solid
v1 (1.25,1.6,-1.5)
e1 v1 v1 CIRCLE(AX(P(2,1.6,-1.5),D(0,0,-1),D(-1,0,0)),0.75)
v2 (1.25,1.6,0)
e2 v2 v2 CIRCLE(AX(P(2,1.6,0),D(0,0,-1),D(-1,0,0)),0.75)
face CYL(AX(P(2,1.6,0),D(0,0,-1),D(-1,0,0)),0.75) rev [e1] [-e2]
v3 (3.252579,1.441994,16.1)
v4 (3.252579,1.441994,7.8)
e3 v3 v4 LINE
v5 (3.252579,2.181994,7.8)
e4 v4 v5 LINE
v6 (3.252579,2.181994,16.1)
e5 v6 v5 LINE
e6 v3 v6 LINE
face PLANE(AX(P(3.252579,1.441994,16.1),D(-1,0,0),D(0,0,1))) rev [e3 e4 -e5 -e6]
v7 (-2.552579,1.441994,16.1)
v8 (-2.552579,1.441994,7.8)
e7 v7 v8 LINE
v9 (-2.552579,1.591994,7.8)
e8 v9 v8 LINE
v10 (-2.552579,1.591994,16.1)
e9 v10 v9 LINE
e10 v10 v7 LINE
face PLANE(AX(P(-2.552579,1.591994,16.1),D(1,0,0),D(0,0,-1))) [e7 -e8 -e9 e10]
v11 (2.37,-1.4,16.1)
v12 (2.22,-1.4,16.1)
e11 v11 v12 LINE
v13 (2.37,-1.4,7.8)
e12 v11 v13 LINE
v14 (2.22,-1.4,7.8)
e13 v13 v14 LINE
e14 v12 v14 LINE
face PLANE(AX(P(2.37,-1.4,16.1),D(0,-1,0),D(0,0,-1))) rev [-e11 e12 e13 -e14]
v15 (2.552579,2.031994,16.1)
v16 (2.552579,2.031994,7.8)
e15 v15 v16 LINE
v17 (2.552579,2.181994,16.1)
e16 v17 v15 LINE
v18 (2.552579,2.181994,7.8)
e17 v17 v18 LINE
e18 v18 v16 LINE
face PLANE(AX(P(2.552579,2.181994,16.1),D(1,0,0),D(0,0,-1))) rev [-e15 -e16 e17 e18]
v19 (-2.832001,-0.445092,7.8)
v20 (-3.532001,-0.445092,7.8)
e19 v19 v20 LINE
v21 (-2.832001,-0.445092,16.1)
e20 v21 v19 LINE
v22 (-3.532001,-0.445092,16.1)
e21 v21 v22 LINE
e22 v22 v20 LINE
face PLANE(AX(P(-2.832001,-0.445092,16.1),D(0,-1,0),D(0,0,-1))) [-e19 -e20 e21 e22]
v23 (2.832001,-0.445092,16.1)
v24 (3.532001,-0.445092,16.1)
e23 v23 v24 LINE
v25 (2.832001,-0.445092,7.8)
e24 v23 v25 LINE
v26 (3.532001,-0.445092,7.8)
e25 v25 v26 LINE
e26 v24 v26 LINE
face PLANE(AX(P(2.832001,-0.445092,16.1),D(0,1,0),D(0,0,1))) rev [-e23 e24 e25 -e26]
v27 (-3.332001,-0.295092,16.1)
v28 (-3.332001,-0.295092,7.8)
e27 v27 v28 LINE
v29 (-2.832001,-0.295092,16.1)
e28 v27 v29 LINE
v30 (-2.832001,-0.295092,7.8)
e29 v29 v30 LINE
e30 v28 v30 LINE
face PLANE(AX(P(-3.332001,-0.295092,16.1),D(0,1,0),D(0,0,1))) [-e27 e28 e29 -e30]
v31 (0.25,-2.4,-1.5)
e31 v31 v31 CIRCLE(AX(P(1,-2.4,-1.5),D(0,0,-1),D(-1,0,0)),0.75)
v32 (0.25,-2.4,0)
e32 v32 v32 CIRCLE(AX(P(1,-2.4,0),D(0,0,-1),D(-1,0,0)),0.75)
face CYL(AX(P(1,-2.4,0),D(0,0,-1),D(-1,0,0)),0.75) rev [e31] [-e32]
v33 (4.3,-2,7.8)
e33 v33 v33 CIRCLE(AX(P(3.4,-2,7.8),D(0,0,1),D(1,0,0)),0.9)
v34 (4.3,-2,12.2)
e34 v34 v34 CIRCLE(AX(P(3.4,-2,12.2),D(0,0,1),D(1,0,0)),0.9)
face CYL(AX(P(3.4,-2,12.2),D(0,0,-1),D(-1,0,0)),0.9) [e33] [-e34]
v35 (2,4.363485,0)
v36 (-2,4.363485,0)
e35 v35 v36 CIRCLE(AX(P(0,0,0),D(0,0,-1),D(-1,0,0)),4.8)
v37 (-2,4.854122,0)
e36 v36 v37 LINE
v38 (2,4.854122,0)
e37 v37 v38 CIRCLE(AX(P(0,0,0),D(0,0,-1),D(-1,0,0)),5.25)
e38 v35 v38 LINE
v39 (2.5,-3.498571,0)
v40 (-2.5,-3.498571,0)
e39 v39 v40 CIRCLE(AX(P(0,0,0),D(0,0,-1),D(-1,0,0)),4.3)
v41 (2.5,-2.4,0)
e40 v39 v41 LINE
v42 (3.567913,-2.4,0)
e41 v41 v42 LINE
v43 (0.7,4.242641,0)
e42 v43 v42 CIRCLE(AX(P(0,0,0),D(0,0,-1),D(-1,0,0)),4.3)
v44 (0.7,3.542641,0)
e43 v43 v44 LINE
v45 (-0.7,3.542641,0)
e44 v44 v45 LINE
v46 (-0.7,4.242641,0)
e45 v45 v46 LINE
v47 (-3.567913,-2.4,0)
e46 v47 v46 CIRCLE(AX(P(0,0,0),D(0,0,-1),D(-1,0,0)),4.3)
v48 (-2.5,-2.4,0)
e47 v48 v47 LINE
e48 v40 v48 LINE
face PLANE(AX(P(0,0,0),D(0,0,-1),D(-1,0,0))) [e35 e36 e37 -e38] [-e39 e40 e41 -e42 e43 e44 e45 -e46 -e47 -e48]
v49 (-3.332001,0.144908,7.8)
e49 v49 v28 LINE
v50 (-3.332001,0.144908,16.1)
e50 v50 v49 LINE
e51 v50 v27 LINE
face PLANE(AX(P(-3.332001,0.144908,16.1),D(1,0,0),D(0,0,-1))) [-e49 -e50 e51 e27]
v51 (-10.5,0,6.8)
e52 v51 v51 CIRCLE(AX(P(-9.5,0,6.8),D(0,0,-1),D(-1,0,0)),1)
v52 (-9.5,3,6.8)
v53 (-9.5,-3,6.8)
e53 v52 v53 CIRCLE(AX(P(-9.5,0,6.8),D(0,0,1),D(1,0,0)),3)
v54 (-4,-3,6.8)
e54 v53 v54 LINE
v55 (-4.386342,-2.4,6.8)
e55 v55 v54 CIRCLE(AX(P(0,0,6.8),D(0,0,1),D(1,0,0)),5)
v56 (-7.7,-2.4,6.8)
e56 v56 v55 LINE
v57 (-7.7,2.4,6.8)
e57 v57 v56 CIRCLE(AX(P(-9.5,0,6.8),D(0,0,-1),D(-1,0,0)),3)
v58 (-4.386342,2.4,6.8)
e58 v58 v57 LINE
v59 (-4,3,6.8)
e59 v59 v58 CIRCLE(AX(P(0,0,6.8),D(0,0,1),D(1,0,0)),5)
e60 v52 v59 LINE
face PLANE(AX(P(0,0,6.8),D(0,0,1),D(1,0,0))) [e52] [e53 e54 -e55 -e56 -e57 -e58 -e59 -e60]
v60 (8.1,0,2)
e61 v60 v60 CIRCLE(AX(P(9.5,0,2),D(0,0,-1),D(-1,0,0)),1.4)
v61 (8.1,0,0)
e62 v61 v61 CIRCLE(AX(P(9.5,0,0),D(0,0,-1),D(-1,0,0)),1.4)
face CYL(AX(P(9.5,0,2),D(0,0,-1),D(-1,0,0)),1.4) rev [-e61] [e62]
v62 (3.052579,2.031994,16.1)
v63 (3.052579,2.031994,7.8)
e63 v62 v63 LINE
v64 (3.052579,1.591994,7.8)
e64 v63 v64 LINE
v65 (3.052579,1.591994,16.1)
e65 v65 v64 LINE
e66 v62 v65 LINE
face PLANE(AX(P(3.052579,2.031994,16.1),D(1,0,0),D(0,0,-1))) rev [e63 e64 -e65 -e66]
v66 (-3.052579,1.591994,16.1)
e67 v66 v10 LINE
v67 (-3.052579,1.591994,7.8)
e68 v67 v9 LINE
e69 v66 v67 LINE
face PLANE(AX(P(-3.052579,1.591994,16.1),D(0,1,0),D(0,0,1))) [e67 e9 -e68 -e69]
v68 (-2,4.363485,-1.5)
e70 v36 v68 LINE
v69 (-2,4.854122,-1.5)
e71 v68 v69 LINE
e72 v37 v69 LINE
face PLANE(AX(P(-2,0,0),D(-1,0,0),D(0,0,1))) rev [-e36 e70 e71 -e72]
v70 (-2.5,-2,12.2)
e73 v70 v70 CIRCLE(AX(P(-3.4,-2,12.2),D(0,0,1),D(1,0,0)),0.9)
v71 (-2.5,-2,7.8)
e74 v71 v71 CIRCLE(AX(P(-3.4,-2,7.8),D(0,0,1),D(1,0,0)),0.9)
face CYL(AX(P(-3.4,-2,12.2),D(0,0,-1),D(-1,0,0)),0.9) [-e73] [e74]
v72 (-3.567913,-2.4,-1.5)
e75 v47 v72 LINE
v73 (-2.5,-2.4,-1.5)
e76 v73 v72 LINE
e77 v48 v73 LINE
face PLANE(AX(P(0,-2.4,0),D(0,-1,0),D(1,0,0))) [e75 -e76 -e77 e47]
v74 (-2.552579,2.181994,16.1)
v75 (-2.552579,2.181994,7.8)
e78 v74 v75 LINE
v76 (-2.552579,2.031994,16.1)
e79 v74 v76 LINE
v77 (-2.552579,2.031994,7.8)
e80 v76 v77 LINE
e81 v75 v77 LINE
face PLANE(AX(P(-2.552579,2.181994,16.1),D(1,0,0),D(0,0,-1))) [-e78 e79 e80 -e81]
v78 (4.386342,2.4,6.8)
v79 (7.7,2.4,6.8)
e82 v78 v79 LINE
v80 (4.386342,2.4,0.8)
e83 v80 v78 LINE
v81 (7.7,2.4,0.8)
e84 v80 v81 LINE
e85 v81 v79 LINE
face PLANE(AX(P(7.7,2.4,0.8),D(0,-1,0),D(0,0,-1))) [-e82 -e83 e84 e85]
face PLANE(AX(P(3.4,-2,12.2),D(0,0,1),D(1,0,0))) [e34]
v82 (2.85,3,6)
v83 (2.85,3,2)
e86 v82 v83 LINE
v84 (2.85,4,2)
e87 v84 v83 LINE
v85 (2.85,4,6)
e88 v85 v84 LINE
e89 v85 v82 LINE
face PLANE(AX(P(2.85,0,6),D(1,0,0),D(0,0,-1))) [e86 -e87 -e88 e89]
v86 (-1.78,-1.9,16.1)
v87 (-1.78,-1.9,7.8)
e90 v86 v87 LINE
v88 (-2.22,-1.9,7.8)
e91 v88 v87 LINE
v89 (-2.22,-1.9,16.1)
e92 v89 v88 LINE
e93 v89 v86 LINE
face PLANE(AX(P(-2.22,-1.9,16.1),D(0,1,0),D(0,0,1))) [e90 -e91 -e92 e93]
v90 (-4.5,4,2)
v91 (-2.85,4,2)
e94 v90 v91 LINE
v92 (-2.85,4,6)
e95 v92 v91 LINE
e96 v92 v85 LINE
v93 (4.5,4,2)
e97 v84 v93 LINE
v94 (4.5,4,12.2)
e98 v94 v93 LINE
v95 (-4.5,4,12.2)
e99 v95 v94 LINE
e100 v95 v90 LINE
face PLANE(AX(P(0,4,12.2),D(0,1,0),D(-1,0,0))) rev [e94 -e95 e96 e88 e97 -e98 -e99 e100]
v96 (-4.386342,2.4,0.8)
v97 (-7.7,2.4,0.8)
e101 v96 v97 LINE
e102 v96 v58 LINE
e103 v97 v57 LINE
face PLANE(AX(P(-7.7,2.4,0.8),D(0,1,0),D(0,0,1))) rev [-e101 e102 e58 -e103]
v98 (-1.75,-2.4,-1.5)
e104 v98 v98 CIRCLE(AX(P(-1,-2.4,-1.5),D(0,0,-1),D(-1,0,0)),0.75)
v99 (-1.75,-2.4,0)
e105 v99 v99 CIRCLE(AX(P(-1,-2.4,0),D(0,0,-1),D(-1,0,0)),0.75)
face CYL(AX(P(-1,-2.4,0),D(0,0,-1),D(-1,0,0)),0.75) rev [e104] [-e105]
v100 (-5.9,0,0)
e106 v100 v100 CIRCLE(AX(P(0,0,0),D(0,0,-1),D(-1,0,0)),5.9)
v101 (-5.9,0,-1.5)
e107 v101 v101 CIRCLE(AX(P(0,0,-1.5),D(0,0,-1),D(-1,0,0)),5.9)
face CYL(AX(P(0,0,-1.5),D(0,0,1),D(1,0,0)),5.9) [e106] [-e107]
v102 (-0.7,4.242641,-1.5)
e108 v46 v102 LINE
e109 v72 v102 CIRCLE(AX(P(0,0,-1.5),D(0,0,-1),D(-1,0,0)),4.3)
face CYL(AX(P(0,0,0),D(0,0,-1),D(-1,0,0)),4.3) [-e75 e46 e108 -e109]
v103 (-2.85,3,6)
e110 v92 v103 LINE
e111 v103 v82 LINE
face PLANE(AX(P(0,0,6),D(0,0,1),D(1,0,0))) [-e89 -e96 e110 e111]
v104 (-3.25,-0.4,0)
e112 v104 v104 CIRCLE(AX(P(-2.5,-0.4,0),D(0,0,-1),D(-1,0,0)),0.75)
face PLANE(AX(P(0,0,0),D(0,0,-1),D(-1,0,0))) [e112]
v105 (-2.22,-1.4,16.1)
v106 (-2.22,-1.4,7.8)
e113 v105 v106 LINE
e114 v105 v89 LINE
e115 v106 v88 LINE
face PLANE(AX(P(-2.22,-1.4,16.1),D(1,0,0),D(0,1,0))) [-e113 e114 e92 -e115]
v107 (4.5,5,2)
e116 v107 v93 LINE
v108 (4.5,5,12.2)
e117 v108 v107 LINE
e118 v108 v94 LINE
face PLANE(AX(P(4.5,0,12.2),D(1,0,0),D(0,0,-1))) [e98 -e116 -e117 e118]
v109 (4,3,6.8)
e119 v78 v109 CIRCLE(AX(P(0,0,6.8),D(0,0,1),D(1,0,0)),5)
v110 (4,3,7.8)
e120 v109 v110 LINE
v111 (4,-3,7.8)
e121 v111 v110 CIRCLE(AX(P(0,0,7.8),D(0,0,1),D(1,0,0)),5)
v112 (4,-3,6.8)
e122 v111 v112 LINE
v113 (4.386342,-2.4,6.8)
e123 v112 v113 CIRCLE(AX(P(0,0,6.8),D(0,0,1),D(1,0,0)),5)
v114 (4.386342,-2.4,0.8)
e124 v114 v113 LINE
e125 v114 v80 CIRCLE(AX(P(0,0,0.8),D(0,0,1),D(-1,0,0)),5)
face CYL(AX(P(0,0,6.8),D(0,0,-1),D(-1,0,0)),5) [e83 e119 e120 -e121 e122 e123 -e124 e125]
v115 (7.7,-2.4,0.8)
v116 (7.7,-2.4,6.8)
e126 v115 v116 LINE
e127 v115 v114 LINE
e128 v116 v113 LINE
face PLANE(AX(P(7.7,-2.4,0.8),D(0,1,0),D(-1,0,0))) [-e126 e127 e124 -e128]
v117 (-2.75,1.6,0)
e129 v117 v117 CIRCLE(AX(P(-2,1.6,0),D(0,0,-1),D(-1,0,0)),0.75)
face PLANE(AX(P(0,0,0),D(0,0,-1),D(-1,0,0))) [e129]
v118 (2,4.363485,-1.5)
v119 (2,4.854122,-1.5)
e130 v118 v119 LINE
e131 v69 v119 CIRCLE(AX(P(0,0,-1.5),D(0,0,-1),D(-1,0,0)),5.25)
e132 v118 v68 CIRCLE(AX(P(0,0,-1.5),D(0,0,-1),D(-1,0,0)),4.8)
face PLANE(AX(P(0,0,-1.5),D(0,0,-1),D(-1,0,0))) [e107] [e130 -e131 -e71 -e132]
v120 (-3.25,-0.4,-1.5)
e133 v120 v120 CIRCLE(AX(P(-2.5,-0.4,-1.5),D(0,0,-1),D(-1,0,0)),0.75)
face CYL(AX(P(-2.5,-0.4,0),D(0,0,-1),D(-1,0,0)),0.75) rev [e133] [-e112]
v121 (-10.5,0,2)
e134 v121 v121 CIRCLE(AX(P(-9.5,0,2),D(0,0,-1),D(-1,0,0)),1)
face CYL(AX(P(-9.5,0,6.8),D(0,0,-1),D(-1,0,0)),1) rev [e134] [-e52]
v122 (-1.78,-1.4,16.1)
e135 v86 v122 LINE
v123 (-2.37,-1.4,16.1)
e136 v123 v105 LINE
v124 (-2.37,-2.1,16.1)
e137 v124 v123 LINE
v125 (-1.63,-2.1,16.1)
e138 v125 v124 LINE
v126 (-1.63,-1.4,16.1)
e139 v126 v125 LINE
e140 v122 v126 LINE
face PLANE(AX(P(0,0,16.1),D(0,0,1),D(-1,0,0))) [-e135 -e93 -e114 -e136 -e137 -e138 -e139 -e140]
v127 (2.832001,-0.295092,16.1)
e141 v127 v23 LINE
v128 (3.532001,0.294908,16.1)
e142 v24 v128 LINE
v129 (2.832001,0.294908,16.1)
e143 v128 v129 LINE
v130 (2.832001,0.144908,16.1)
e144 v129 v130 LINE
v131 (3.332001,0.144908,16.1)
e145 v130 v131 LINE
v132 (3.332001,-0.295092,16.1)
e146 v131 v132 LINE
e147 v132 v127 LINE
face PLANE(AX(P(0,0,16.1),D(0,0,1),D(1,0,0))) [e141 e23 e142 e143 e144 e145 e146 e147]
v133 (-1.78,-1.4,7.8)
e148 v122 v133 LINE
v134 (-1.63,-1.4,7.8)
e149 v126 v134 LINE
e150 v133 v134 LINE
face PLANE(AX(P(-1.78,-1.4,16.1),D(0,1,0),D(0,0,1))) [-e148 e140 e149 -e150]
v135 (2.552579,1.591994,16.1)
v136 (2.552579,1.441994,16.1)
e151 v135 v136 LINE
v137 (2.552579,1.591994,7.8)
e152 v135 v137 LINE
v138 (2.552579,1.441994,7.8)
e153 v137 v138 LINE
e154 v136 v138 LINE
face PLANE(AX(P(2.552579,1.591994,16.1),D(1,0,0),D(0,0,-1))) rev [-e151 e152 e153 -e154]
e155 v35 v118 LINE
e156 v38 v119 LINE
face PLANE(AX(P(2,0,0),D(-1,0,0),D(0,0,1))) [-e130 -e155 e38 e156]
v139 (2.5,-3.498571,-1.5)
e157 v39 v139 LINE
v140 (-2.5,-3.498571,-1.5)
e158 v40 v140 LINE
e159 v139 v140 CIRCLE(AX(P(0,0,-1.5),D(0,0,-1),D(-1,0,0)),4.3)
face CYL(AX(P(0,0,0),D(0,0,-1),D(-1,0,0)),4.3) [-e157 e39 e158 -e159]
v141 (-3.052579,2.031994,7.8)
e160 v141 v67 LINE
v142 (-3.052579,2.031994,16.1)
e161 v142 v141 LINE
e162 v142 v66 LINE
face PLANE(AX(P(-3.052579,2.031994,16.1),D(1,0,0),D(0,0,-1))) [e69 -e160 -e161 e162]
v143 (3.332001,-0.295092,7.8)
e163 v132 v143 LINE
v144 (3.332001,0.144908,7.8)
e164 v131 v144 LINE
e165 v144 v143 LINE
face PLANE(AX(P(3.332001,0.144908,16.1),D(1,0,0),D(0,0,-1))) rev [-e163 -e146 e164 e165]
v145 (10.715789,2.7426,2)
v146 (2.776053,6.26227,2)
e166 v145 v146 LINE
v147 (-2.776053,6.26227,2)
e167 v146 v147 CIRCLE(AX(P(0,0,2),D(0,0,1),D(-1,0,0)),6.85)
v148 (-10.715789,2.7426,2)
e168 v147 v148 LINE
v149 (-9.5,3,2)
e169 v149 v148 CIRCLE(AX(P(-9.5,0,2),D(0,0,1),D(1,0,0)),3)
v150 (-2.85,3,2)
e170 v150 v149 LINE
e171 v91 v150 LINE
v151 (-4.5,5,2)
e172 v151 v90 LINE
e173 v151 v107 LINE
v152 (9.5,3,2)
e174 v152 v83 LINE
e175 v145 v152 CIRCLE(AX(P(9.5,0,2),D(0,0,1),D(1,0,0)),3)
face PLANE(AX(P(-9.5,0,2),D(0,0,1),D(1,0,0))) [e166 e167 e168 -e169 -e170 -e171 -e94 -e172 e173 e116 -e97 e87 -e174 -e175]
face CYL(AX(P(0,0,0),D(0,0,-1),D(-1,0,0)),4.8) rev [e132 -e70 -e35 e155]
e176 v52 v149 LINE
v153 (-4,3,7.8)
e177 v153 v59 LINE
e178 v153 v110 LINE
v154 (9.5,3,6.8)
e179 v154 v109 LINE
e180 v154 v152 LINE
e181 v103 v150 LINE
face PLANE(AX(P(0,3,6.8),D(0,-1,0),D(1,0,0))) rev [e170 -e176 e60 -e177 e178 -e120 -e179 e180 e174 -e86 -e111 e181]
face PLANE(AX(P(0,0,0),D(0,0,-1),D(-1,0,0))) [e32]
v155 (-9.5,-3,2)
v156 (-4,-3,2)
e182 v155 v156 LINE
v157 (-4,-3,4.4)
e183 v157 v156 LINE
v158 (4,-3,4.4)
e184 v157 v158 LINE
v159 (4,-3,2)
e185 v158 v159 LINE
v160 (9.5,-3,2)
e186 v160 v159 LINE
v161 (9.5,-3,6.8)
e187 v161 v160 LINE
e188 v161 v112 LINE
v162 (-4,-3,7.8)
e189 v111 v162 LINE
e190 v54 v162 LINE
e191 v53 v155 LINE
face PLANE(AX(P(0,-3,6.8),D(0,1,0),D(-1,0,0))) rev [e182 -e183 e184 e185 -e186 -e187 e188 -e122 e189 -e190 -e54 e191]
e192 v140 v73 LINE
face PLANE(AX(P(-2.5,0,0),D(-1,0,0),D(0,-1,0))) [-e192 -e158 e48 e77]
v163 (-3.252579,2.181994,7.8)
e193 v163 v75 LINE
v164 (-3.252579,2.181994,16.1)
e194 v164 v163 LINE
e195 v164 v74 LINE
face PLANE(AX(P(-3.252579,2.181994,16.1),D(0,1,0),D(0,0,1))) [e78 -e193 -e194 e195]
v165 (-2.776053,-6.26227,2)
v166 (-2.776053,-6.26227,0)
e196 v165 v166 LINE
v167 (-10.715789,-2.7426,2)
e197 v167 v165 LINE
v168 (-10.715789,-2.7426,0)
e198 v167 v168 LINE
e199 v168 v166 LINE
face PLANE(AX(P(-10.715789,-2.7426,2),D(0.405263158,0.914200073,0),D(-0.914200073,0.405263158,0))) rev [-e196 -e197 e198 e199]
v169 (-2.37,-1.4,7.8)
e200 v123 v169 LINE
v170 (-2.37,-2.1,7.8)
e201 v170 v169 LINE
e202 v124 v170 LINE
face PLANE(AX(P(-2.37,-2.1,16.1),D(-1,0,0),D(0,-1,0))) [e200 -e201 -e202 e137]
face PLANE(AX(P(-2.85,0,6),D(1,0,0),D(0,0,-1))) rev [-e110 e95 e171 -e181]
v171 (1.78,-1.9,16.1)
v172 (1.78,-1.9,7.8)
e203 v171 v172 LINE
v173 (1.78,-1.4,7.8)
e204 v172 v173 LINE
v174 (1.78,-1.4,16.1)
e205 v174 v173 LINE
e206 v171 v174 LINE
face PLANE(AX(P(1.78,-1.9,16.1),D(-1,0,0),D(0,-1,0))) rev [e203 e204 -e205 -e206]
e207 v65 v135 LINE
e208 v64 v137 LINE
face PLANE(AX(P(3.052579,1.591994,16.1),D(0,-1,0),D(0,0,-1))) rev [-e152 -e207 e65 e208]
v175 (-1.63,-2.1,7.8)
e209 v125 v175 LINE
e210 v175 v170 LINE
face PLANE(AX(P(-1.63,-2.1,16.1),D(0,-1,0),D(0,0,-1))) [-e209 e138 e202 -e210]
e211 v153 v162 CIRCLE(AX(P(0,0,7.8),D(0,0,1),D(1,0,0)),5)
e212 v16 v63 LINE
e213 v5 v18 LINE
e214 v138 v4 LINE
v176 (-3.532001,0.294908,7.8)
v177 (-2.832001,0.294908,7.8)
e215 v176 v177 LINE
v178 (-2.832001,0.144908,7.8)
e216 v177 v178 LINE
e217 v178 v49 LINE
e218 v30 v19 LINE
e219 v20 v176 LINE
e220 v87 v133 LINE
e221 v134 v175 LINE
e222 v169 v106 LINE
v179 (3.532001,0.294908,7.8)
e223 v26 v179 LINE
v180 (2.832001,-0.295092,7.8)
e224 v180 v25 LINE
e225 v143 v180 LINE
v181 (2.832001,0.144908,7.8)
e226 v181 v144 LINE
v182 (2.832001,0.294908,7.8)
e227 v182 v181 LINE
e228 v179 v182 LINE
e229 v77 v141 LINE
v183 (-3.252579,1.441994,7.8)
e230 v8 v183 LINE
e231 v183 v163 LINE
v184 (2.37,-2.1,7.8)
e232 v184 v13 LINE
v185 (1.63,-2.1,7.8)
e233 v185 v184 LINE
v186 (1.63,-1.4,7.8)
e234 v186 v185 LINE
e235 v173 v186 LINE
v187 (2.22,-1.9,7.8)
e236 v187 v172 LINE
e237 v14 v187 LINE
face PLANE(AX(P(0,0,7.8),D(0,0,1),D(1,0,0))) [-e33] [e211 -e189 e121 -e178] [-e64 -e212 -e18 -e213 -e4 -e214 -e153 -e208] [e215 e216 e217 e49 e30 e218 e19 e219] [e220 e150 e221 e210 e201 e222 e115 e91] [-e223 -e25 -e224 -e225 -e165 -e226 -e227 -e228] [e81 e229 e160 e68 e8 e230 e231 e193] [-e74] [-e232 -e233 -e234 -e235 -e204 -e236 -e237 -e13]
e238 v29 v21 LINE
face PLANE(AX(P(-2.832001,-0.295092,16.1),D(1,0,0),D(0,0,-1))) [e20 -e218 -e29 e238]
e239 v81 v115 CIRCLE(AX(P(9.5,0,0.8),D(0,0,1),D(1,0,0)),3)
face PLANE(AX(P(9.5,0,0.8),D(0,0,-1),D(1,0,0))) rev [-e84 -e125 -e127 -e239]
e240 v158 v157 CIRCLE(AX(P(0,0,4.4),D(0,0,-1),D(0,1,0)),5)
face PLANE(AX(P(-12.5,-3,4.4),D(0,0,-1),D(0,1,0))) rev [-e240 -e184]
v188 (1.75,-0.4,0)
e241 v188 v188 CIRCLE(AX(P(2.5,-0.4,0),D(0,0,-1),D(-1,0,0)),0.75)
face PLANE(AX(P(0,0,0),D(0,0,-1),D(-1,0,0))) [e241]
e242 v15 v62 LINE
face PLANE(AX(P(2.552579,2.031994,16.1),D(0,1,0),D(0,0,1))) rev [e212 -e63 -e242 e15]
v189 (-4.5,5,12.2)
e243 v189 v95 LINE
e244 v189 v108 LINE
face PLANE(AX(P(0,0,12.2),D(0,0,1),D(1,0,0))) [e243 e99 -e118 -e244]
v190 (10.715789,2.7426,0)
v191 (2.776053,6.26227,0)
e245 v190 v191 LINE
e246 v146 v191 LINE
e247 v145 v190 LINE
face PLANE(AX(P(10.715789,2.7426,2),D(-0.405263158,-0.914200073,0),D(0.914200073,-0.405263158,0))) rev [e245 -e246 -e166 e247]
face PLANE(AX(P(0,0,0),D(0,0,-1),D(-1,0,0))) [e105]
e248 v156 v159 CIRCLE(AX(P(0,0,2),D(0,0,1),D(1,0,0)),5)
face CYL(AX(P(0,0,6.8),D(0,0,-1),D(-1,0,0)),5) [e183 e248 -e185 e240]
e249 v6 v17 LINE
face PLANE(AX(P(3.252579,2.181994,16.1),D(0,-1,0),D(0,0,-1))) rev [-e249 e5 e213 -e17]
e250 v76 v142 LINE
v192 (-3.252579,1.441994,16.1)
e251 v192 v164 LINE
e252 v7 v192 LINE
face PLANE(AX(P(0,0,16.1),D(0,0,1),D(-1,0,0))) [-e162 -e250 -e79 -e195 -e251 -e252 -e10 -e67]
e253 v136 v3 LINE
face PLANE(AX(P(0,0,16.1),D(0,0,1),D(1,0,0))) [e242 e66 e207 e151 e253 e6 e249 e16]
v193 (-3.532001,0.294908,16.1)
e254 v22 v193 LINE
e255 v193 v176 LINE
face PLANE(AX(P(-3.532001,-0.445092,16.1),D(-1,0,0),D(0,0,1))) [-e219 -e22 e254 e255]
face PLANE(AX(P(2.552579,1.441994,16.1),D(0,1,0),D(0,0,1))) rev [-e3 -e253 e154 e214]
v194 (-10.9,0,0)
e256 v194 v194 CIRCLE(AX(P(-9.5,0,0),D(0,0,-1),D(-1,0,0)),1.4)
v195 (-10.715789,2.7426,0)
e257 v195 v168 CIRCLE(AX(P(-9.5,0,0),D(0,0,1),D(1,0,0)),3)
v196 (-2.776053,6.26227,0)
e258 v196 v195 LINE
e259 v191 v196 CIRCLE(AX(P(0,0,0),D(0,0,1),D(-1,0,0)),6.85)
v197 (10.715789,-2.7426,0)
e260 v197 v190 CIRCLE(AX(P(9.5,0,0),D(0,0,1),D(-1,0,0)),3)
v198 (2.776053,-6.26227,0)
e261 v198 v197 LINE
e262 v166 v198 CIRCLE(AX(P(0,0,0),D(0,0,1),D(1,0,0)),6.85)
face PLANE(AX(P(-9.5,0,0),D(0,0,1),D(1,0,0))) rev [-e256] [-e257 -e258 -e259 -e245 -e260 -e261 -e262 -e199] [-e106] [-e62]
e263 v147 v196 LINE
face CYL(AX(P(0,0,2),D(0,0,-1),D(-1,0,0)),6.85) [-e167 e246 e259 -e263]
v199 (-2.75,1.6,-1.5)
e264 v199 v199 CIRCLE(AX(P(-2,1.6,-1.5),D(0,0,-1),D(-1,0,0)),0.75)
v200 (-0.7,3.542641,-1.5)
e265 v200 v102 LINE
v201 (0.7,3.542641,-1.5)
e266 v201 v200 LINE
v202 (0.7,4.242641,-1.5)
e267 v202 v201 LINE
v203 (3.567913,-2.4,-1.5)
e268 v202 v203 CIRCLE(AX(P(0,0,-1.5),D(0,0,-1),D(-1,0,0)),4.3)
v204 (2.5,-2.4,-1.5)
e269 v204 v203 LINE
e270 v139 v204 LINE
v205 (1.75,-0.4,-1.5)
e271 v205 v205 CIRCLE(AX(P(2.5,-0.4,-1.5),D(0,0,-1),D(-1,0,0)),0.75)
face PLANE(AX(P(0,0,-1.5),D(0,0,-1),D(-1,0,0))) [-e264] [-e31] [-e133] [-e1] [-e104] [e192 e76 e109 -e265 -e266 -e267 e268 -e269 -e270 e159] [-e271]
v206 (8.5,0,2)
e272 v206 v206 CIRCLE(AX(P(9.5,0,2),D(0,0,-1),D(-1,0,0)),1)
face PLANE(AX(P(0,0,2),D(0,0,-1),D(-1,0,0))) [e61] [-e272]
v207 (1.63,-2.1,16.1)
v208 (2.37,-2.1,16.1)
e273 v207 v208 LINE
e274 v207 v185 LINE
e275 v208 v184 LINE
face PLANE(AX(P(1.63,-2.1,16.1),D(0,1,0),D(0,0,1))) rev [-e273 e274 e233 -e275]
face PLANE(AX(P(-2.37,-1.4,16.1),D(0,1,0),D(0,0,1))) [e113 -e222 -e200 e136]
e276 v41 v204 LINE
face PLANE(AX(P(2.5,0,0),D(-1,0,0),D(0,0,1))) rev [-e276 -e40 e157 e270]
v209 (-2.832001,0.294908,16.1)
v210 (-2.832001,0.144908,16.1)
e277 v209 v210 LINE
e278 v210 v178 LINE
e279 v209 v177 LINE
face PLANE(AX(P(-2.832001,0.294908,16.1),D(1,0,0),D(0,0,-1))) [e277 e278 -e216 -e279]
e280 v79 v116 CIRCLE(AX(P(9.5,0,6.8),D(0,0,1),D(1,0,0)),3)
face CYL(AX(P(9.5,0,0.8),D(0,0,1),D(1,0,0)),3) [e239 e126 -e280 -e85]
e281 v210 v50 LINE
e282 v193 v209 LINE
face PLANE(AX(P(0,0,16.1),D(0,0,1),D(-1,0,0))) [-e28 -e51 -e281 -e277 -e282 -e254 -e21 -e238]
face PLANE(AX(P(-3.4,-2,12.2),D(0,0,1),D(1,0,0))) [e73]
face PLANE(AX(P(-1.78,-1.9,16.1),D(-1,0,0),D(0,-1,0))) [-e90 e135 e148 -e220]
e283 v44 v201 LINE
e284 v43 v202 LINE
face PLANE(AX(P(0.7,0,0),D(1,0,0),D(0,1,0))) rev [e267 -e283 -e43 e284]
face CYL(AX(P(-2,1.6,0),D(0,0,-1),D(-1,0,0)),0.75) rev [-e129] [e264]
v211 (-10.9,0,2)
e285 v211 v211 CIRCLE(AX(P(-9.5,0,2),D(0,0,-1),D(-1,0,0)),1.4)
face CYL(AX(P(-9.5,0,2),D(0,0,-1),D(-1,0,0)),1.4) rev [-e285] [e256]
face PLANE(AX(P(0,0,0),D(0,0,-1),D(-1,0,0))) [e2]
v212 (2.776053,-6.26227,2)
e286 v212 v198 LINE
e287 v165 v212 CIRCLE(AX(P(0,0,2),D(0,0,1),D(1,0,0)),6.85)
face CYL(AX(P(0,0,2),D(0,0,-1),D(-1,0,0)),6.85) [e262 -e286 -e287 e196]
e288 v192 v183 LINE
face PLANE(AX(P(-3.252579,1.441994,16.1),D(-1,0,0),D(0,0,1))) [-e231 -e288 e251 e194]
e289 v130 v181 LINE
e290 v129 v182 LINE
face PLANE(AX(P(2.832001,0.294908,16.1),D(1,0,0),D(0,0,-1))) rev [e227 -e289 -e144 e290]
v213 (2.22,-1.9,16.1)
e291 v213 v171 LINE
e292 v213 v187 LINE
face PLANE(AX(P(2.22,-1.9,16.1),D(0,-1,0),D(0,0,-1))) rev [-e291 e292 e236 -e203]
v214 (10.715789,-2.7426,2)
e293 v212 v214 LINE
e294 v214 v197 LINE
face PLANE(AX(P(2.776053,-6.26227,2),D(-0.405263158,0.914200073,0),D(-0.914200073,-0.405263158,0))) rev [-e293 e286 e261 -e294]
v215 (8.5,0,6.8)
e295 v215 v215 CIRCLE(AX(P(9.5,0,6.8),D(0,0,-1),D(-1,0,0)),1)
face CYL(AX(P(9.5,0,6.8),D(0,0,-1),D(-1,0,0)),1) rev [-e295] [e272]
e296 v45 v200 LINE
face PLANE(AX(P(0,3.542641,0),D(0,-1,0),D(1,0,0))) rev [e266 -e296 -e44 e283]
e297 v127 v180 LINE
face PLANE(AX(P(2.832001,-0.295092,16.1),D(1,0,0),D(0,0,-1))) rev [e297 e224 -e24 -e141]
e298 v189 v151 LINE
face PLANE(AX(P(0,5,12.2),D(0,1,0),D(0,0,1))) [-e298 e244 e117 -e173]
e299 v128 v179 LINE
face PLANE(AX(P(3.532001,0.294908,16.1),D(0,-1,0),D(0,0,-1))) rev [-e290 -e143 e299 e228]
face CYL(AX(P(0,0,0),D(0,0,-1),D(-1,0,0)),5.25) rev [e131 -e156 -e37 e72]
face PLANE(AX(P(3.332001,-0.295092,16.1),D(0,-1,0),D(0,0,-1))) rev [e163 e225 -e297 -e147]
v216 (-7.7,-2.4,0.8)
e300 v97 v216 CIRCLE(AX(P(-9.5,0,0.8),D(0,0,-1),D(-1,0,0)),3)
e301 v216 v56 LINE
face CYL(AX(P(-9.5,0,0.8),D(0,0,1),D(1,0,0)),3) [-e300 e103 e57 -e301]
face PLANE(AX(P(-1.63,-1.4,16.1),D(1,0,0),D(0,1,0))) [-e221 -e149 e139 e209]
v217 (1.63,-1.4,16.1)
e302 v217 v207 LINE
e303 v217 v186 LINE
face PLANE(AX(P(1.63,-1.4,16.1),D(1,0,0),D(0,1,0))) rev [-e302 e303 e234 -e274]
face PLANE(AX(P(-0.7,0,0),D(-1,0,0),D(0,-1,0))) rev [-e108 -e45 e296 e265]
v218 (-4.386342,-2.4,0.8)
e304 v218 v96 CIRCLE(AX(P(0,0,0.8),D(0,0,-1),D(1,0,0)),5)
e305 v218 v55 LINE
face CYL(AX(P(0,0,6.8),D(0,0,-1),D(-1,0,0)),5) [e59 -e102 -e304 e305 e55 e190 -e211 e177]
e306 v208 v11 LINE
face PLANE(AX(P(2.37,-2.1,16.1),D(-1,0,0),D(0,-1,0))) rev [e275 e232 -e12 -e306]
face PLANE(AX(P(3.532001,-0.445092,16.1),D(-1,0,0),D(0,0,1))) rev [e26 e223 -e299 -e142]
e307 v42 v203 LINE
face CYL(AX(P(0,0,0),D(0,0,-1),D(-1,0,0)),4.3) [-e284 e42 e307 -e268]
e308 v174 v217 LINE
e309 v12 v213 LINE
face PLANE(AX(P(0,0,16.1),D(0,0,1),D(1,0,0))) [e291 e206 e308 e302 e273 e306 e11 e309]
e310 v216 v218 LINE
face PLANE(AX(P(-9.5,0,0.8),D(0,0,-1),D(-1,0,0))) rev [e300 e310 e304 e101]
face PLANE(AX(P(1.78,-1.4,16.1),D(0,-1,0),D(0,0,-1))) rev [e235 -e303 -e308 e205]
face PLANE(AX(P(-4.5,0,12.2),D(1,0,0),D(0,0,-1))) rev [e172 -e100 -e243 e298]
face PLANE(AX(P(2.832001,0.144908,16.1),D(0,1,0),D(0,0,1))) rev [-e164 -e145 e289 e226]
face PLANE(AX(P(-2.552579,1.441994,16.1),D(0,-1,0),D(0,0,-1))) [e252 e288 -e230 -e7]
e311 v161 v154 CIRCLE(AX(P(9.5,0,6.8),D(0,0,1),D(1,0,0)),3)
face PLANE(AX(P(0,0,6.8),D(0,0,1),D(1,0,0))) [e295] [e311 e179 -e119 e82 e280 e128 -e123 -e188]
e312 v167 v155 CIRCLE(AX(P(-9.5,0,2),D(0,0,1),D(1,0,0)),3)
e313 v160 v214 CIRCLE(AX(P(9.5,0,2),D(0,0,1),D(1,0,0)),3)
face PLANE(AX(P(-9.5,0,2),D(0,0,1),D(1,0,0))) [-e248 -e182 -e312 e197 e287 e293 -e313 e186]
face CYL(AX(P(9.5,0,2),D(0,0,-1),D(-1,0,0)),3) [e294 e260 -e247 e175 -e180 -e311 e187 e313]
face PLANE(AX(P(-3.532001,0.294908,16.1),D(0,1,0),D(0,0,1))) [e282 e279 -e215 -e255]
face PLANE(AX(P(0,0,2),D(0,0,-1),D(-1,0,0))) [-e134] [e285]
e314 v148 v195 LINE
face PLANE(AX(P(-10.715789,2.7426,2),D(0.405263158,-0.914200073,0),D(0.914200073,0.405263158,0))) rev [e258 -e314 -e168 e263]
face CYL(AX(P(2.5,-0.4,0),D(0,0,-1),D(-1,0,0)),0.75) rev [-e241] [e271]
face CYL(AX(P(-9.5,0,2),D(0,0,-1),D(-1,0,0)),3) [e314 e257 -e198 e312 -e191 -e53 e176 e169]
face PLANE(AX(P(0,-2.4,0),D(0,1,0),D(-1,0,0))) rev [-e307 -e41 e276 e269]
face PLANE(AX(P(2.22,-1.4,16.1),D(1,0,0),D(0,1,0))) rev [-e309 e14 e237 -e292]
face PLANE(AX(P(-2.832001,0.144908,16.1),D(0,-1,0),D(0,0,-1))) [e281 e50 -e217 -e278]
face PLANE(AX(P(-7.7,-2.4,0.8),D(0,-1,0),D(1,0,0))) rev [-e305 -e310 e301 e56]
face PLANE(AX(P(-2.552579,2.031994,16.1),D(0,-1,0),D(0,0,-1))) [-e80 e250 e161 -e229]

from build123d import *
from build123d.topology import SkipClean

# Parameters (mm, degrees)
BASEBODY_DEPTH           = 2
SKETCH_2_R               = 5.9
FRONTBODY_DEPTH          = 1.5
SOCKET_START             = -1.5
SOCKET_DEPTH             = 1.5
SKETCH_3_3_R             = 0.75
SOCKETPINS_DEPTH         = 1.5
SKETCH_4_R               = 5
RBODY_DEPTH              = 4.8
SKETCH_5_R               = 1.4
HOLE1_DEPTH              = 2
SKETCH_5_3_R             = 1
HOLE2_DEPTH              = 16.792798992
LIGHTING_START           = -6
LIGHTING_DEPTH           = 6
SKETCH_7_R               = 5
RBODY2_DEPTH             = 1
LIGHTING3_DEPTH          = 17.248461466
LIGHTING3_DEPTH_BACK     = 17.248461466
SKETCH_8_W               = 3.4
SKETCH_8_H               = 2
CUT_EXTRUDE_8_DEPTH      = 17.248461466
CUT_EXTRUDE_8_DEPTH_BACK = 17.248461466
SKETCH_9_W               = 5.8
SKETCH_9_H               = 2
SKETCH_10_W              = 5.7
SKETCH_10_H              = 1
EXTRUDE_2_DEPTH          = 4
EXTRUDE_3_DEPTH          = 10.2
SKETCH_11_R              = 0.9
EXTRUDE_4_DEPTH          = 4.4
EXTRUDE_5_DEPTH          = 8.3


# Read off the part's stored shape, not the designer's step: Socket
with BuildPart() as part:
    # Эскиз1 → BaseBody (new body)
    with BuildSketch(Plane.XY):
        with BuildLine():
            Line((-10.715789474, 2.742600218), (-2.776052632, 6.262270498))
            ThreePointArc((-2.776052632, 6.262270498), (0, 6.85), (2.776052632, 6.262270498))
            Line((2.776052632, 6.262270498), (10.715789474, 2.742600218))
            ThreePointArc((10.715789474, 2.742600218), (12.5, 0), (10.715789474, -2.742600218))
            Line((10.715789474, -2.742600218), (2.776052632, -6.262270498))
            ThreePointArc((2.776052632, -6.262270498), (0, -6.85), (-2.776052632, -6.262270498))
            Line((-2.776052632, -6.262270498), (-10.715789474, -2.742600218))
            ThreePointArc((-10.715789474, -2.742600218), (-12.5, 0), (-10.715789474, 2.742600218))
        make_face()
    extrude(amount=BASEBODY_DEPTH)

    # Эскиз2 → FrontBody (add)
    with BuildSketch(Plane(origin=(0, 0, 0), x_dir=(-1, 0, 0), z_dir=(0, 0, -1))):
        Circle(SKETCH_2_R)
    extrude(amount=FRONTBODY_DEPTH)

    # Socket outline → Socket (cut)
    with BuildSketch(Plane(origin=(0, 0, -1.5), x_dir=(-1, 0, 0), z_dir=(0, 0, -1)).offset(SOCKET_START)):
        with BuildLine():
            Line((-2, 4.85412196), (-2, 4.363484846))
            ThreePointArc((-2, 4.363484846), (0, -4.8), (2, 4.363484846))
            Line((2, 4.363484846), (2, 4.85412196))
            ThreePointArc((2, 4.85412196), (0, 5.25), (-2, 4.85412196))
        make_face()
        with BuildLine():
            ThreePointArc((-3.567912555, -2.4), (-3.947776364, 1.704424179), (-0.7, 4.242640687))
            Line((-0.7, 4.242640687), (-0.7, 3.542640687))
            Line((-0.7, 3.542640687), (0.7, 3.542640687))
            Line((0.7, 3.542640687), (0.7, 4.242640687))
            ThreePointArc((0.7, 4.242640687), (3.947776364, 1.704424179), (3.567912555, -2.4))
            Line((3.567912555, -2.4), (2.5, -2.4))
            Line((2.5, -2.4), (2.5, -3.498571137))
            ThreePointArc((2.5, -3.498571137), (0, -4.3), (-2.5, -3.498571137))
            Line((-2.5, -3.498571137), (-2.5, -2.4))
            Line((-2.5, -2.4), (-3.567912555, -2.4))
        make_face(mode=Mode.SUBTRACT)
    extrude(amount=SOCKET_DEPTH, mode=Mode.SUBTRACT)

    # Эскиз3<3> → SocketPins (cut)
    with BuildSketch(Plane(origin=(0, 0, -1.5), x_dir=(-1, 0, 0), z_dir=(0, 0, -1))):
        with Locations((-2, 1.6)):
            Circle(SKETCH_3_3_R)
        with Locations((-2.5, -0.4)):
            Circle(SKETCH_3_3_R)
        with Locations((-1, -2.4)):
            Circle(SKETCH_3_3_R)
        with Locations((1, -2.4)):
            Circle(SKETCH_3_3_R)
        with Locations((2.5, -0.4)):
            Circle(SKETCH_3_3_R)
        with Locations((2, 1.6)):
            Circle(SKETCH_3_3_R)
    extrude(amount=-SOCKETPINS_DEPTH, mode=Mode.SUBTRACT)

    # Эскиз4 → RBody (add)
    with SkipClean():  # the faces are left unmerged after this step: merging them gives an invalid solid
        with BuildSketch(Plane.XY.offset(2)):
            with BuildLine():
                ThreePointArc((-6.5, 0), (-7.378679656, 2.121320344), (-9.5, 3))
                ThreePointArc((-9.5, 3), (-10.121369192, 2.934944689), (-10.715789474, 2.742600218))
                ThreePointArc((-10.715789474, 2.742600218), (-12.5, 0), (-10.715789474, -2.742600218))
                ThreePointArc((-10.715789474, -2.742600218), (-10.121369192, -2.934944689), (-9.5, -3))
                ThreePointArc((-9.5, -3), (-7.378679656, -2.121320344), (-6.5, 0))
            make_face()
            with BuildLine():
                Line((-4, 3), (-9.5, 3))
                ThreePointArc((-9.5, 3), (-7.378679656, 2.121320344), (-6.5, 0))
                ThreePointArc((-6.5, 0), (-7.378679656, -2.121320344), (-9.5, -3))
                Line((-9.5, -3), (-4, -3))
                ThreePointArc((-4, -3), (-5, 0), (-4, 3))
            make_face()
            Circle(SKETCH_4_R)
            with BuildLine():
                Line((9.5, 3), (4, 3))
                ThreePointArc((4, 3), (4.74341649, 1.58113883), (5, 0))
                ThreePointArc((5, 0), (4.74341649, -1.58113883), (4, -3))
                Line((4, -3), (9.5, -3))
                ThreePointArc((9.5, -3), (6.5, 0), (9.5, 3))
            make_face()
            with BuildLine():
                ThreePointArc((10.715789474, 2.742600218), (10.121369192, 2.934944689), (9.5, 3))
                ThreePointArc((9.5, 3), (6.5, 0), (9.5, -3))
                ThreePointArc((9.5, -3), (10.121369192, -2.934944689), (10.715789474, -2.742600218))
                ThreePointArc((10.715789474, -2.742600218), (12.014693661, -1.635944923), (12.5, 0))
                ThreePointArc((12.5, 0), (12.014693661, 1.635944923), (10.715789474, 2.742600218))
            make_face()
        extrude(amount=RBODY_DEPTH)

    # Эскиз5 → Hole1 (cut)
    with SkipClean():  # the faces are left unmerged after this step: merging them gives an invalid solid
        with BuildSketch(Plane(origin=(0, 0, 0), x_dir=(-1, 0, 0), z_dir=(0, 0, -1))):
            with Locations((9.5, 0)):
                Circle(SKETCH_5_R)
            with Locations((-9.5, 0)):
                Circle(SKETCH_5_R)
        extrude(amount=-HOLE1_DEPTH, mode=Mode.SUBTRACT)

    # Эскиз5<3> → Hole2 (cut, through all)
    with SkipClean():  # the faces are left unmerged after this step: merging them gives an invalid solid
        with BuildSketch(Plane(origin=(0, 0, 0), x_dir=(-1, 0, 0), z_dir=(0, 0, -1))):
            with Locations((9.5, 0)):
                Circle(SKETCH_5_3_R)
            with Locations((-9.5, 0)):
                Circle(SKETCH_5_3_R)
        extrude(amount=-HOLE2_DEPTH, mode=Mode.SUBTRACT)

    # Эскиз6 → Lighting (cut)
    with SkipClean():  # the faces are left unmerged after this step: merging them gives an invalid solid
        with BuildSketch(Plane.XY.offset(6.8).offset(LIGHTING_START)):
            with BuildLine():
                Line((-7.7, 2.4), (-4.38634244, 2.4))
                ThreePointArc((-4.38634244, 2.4), (-5, 0), (-4.38634244, -2.4))
                Line((-4.38634244, -2.4), (-7.7, -2.4))
                ThreePointArc((-7.7, -2.4), (-6.5, 0), (-7.7, 2.4))
            make_face()
        lighting = extrude(amount=LIGHTING_DEPTH, mode=Mode.SUBTRACT)

    # Lighting2: Lighting across plane
    with SkipClean():  # the faces are left unmerged after this step: merging them gives an invalid solid
        add(lighting.mirror(Plane(origin=(0, 0, 0), x_dir=(0, 0, 1), z_dir=(1, 0, 0))), mode=Mode.SUBTRACT)

    # Эскиз7 → RBody2 (add)
    with SkipClean():  # the faces are left unmerged after this step: merging them gives an invalid solid
        with BuildSketch(Plane.XY.offset(6.8)):
            with Locations(Location((0, 0, 0), (0, 0, 151.314597986))):
                Circle(SKETCH_7_R)
        extrude(amount=RBODY2_DEPTH)

    # Эскиз8 → Lighting3 (cut, two sides: drawn at the far end of the back side and taken through both)
    with SkipClean():  # the faces are left unmerged after this step: merging them gives an invalid solid
        with BuildSketch(Plane(origin=(0, 0, 0), x_dir=(0, 0, -1), z_dir=(1, 0, 0)).offset(-LIGHTING3_DEPTH_BACK)):
            with Locations((-6.1, -4)):
                Rectangle(SKETCH_8_W, SKETCH_8_H)
        extrude(amount=LIGHTING3_DEPTH + LIGHTING3_DEPTH_BACK, mode=Mode.SUBTRACT)

    # Эскиз9 → Вырез-Вытянуть8 (cut, two sides: drawn at the far end of the back side and taken through both)
    with SkipClean():  # the faces are left unmerged after this step: merging them gives an invalid solid
        with BuildSketch(Plane(origin=(0, 0, 0), x_dir=(0, 0, -1), z_dir=(1, 0, 0)).offset(-CUT_EXTRUDE_8_DEPTH_BACK)):
            with Locations((-4.9, 4)):
                Rectangle(SKETCH_9_W, SKETCH_9_H)
        extrude(amount=CUT_EXTRUDE_8_DEPTH + CUT_EXTRUDE_8_DEPTH_BACK, mode=Mode.SUBTRACT)

    # Эскиз10 → Бобышка-Вытянуть2 (add)
    with SkipClean():  # the faces are left unmerged after this step: merging them gives an invalid solid
        with BuildSketch(Plane.XY.offset(2)):
            with Locations((0, 3.5)):
                Rectangle(SKETCH_10_W, SKETCH_10_H)
        extrude(amount=EXTRUDE_2_DEPTH)

    # Эскиз10<3> → Бобышка-Вытянуть3 (add)
    with SkipClean():  # the faces are left unmerged after this step: merging them gives an invalid solid
        with BuildSketch(Plane.XY.offset(2)):
            Polygon((-4.5, 4), (-2.85, 4), (2.85, 4), (4.5, 4), (4.5, 5), (-4.5, 5), align=None)
        extrude(amount=EXTRUDE_3_DEPTH)

    # Эскиз11 → Бобышка-Вытянуть4 (add)
    with SkipClean():  # the faces are left unmerged after this step: merging them gives an invalid solid
        with BuildSketch(Plane.XY.offset(7.8)):
            with Locations((-3.4, -2)):
                Circle(SKETCH_11_R)
            with Locations((3.4, -2)):
                Circle(SKETCH_11_R)
        extrude(amount=EXTRUDE_4_DEPTH)

    # Эскиз12 → Бобышка-Вытянуть5 (add)
    with SkipClean():  # the faces are left unmerged after this step: merging them gives an invalid solid
        with BuildSketch(Plane.XY.offset(7.8)):
            Polygon((1.63, -1.4), (1.63, -2.1), (2.37, -2.1), (2.37, -1.4), (2.22, -1.4), (2.22, -1.9), (1.78, -1.9), (1.78, -1.4), align=None)
            Polygon((2.832000989, -0.445092269), (3.532000989, -0.445092269), (3.532000989, 0.294907731), (2.832000989, 0.294907731), (2.832000989, 0.144907731), (3.332000989, 0.144907731), (3.332000989, -0.295092269), (2.832000989, -0.295092269), align=None)
            Polygon((2.552578831, 1.441994282), (3.252578831, 1.441994282), (3.252578831, 2.181994282), (2.552578831, 2.181994282), (2.552578831, 2.031994282), (3.052578831, 2.031994282), (3.052578831, 1.591994282), (2.552578831, 1.591994282), align=None)
        extrude_5 = extrude(amount=EXTRUDE_5_DEPTH)

    # Зеркальное отражение3: Бобышка-Вытянуть5 across plane
    with SkipClean():  # the faces are left unmerged after this step: merging them gives an invalid solid
        add(extrude_5.mirror(Plane(origin=(0, 0, 0), x_dir=(0, 0, 1), z_dir=(1, 0, 0))))


solid = part.part
